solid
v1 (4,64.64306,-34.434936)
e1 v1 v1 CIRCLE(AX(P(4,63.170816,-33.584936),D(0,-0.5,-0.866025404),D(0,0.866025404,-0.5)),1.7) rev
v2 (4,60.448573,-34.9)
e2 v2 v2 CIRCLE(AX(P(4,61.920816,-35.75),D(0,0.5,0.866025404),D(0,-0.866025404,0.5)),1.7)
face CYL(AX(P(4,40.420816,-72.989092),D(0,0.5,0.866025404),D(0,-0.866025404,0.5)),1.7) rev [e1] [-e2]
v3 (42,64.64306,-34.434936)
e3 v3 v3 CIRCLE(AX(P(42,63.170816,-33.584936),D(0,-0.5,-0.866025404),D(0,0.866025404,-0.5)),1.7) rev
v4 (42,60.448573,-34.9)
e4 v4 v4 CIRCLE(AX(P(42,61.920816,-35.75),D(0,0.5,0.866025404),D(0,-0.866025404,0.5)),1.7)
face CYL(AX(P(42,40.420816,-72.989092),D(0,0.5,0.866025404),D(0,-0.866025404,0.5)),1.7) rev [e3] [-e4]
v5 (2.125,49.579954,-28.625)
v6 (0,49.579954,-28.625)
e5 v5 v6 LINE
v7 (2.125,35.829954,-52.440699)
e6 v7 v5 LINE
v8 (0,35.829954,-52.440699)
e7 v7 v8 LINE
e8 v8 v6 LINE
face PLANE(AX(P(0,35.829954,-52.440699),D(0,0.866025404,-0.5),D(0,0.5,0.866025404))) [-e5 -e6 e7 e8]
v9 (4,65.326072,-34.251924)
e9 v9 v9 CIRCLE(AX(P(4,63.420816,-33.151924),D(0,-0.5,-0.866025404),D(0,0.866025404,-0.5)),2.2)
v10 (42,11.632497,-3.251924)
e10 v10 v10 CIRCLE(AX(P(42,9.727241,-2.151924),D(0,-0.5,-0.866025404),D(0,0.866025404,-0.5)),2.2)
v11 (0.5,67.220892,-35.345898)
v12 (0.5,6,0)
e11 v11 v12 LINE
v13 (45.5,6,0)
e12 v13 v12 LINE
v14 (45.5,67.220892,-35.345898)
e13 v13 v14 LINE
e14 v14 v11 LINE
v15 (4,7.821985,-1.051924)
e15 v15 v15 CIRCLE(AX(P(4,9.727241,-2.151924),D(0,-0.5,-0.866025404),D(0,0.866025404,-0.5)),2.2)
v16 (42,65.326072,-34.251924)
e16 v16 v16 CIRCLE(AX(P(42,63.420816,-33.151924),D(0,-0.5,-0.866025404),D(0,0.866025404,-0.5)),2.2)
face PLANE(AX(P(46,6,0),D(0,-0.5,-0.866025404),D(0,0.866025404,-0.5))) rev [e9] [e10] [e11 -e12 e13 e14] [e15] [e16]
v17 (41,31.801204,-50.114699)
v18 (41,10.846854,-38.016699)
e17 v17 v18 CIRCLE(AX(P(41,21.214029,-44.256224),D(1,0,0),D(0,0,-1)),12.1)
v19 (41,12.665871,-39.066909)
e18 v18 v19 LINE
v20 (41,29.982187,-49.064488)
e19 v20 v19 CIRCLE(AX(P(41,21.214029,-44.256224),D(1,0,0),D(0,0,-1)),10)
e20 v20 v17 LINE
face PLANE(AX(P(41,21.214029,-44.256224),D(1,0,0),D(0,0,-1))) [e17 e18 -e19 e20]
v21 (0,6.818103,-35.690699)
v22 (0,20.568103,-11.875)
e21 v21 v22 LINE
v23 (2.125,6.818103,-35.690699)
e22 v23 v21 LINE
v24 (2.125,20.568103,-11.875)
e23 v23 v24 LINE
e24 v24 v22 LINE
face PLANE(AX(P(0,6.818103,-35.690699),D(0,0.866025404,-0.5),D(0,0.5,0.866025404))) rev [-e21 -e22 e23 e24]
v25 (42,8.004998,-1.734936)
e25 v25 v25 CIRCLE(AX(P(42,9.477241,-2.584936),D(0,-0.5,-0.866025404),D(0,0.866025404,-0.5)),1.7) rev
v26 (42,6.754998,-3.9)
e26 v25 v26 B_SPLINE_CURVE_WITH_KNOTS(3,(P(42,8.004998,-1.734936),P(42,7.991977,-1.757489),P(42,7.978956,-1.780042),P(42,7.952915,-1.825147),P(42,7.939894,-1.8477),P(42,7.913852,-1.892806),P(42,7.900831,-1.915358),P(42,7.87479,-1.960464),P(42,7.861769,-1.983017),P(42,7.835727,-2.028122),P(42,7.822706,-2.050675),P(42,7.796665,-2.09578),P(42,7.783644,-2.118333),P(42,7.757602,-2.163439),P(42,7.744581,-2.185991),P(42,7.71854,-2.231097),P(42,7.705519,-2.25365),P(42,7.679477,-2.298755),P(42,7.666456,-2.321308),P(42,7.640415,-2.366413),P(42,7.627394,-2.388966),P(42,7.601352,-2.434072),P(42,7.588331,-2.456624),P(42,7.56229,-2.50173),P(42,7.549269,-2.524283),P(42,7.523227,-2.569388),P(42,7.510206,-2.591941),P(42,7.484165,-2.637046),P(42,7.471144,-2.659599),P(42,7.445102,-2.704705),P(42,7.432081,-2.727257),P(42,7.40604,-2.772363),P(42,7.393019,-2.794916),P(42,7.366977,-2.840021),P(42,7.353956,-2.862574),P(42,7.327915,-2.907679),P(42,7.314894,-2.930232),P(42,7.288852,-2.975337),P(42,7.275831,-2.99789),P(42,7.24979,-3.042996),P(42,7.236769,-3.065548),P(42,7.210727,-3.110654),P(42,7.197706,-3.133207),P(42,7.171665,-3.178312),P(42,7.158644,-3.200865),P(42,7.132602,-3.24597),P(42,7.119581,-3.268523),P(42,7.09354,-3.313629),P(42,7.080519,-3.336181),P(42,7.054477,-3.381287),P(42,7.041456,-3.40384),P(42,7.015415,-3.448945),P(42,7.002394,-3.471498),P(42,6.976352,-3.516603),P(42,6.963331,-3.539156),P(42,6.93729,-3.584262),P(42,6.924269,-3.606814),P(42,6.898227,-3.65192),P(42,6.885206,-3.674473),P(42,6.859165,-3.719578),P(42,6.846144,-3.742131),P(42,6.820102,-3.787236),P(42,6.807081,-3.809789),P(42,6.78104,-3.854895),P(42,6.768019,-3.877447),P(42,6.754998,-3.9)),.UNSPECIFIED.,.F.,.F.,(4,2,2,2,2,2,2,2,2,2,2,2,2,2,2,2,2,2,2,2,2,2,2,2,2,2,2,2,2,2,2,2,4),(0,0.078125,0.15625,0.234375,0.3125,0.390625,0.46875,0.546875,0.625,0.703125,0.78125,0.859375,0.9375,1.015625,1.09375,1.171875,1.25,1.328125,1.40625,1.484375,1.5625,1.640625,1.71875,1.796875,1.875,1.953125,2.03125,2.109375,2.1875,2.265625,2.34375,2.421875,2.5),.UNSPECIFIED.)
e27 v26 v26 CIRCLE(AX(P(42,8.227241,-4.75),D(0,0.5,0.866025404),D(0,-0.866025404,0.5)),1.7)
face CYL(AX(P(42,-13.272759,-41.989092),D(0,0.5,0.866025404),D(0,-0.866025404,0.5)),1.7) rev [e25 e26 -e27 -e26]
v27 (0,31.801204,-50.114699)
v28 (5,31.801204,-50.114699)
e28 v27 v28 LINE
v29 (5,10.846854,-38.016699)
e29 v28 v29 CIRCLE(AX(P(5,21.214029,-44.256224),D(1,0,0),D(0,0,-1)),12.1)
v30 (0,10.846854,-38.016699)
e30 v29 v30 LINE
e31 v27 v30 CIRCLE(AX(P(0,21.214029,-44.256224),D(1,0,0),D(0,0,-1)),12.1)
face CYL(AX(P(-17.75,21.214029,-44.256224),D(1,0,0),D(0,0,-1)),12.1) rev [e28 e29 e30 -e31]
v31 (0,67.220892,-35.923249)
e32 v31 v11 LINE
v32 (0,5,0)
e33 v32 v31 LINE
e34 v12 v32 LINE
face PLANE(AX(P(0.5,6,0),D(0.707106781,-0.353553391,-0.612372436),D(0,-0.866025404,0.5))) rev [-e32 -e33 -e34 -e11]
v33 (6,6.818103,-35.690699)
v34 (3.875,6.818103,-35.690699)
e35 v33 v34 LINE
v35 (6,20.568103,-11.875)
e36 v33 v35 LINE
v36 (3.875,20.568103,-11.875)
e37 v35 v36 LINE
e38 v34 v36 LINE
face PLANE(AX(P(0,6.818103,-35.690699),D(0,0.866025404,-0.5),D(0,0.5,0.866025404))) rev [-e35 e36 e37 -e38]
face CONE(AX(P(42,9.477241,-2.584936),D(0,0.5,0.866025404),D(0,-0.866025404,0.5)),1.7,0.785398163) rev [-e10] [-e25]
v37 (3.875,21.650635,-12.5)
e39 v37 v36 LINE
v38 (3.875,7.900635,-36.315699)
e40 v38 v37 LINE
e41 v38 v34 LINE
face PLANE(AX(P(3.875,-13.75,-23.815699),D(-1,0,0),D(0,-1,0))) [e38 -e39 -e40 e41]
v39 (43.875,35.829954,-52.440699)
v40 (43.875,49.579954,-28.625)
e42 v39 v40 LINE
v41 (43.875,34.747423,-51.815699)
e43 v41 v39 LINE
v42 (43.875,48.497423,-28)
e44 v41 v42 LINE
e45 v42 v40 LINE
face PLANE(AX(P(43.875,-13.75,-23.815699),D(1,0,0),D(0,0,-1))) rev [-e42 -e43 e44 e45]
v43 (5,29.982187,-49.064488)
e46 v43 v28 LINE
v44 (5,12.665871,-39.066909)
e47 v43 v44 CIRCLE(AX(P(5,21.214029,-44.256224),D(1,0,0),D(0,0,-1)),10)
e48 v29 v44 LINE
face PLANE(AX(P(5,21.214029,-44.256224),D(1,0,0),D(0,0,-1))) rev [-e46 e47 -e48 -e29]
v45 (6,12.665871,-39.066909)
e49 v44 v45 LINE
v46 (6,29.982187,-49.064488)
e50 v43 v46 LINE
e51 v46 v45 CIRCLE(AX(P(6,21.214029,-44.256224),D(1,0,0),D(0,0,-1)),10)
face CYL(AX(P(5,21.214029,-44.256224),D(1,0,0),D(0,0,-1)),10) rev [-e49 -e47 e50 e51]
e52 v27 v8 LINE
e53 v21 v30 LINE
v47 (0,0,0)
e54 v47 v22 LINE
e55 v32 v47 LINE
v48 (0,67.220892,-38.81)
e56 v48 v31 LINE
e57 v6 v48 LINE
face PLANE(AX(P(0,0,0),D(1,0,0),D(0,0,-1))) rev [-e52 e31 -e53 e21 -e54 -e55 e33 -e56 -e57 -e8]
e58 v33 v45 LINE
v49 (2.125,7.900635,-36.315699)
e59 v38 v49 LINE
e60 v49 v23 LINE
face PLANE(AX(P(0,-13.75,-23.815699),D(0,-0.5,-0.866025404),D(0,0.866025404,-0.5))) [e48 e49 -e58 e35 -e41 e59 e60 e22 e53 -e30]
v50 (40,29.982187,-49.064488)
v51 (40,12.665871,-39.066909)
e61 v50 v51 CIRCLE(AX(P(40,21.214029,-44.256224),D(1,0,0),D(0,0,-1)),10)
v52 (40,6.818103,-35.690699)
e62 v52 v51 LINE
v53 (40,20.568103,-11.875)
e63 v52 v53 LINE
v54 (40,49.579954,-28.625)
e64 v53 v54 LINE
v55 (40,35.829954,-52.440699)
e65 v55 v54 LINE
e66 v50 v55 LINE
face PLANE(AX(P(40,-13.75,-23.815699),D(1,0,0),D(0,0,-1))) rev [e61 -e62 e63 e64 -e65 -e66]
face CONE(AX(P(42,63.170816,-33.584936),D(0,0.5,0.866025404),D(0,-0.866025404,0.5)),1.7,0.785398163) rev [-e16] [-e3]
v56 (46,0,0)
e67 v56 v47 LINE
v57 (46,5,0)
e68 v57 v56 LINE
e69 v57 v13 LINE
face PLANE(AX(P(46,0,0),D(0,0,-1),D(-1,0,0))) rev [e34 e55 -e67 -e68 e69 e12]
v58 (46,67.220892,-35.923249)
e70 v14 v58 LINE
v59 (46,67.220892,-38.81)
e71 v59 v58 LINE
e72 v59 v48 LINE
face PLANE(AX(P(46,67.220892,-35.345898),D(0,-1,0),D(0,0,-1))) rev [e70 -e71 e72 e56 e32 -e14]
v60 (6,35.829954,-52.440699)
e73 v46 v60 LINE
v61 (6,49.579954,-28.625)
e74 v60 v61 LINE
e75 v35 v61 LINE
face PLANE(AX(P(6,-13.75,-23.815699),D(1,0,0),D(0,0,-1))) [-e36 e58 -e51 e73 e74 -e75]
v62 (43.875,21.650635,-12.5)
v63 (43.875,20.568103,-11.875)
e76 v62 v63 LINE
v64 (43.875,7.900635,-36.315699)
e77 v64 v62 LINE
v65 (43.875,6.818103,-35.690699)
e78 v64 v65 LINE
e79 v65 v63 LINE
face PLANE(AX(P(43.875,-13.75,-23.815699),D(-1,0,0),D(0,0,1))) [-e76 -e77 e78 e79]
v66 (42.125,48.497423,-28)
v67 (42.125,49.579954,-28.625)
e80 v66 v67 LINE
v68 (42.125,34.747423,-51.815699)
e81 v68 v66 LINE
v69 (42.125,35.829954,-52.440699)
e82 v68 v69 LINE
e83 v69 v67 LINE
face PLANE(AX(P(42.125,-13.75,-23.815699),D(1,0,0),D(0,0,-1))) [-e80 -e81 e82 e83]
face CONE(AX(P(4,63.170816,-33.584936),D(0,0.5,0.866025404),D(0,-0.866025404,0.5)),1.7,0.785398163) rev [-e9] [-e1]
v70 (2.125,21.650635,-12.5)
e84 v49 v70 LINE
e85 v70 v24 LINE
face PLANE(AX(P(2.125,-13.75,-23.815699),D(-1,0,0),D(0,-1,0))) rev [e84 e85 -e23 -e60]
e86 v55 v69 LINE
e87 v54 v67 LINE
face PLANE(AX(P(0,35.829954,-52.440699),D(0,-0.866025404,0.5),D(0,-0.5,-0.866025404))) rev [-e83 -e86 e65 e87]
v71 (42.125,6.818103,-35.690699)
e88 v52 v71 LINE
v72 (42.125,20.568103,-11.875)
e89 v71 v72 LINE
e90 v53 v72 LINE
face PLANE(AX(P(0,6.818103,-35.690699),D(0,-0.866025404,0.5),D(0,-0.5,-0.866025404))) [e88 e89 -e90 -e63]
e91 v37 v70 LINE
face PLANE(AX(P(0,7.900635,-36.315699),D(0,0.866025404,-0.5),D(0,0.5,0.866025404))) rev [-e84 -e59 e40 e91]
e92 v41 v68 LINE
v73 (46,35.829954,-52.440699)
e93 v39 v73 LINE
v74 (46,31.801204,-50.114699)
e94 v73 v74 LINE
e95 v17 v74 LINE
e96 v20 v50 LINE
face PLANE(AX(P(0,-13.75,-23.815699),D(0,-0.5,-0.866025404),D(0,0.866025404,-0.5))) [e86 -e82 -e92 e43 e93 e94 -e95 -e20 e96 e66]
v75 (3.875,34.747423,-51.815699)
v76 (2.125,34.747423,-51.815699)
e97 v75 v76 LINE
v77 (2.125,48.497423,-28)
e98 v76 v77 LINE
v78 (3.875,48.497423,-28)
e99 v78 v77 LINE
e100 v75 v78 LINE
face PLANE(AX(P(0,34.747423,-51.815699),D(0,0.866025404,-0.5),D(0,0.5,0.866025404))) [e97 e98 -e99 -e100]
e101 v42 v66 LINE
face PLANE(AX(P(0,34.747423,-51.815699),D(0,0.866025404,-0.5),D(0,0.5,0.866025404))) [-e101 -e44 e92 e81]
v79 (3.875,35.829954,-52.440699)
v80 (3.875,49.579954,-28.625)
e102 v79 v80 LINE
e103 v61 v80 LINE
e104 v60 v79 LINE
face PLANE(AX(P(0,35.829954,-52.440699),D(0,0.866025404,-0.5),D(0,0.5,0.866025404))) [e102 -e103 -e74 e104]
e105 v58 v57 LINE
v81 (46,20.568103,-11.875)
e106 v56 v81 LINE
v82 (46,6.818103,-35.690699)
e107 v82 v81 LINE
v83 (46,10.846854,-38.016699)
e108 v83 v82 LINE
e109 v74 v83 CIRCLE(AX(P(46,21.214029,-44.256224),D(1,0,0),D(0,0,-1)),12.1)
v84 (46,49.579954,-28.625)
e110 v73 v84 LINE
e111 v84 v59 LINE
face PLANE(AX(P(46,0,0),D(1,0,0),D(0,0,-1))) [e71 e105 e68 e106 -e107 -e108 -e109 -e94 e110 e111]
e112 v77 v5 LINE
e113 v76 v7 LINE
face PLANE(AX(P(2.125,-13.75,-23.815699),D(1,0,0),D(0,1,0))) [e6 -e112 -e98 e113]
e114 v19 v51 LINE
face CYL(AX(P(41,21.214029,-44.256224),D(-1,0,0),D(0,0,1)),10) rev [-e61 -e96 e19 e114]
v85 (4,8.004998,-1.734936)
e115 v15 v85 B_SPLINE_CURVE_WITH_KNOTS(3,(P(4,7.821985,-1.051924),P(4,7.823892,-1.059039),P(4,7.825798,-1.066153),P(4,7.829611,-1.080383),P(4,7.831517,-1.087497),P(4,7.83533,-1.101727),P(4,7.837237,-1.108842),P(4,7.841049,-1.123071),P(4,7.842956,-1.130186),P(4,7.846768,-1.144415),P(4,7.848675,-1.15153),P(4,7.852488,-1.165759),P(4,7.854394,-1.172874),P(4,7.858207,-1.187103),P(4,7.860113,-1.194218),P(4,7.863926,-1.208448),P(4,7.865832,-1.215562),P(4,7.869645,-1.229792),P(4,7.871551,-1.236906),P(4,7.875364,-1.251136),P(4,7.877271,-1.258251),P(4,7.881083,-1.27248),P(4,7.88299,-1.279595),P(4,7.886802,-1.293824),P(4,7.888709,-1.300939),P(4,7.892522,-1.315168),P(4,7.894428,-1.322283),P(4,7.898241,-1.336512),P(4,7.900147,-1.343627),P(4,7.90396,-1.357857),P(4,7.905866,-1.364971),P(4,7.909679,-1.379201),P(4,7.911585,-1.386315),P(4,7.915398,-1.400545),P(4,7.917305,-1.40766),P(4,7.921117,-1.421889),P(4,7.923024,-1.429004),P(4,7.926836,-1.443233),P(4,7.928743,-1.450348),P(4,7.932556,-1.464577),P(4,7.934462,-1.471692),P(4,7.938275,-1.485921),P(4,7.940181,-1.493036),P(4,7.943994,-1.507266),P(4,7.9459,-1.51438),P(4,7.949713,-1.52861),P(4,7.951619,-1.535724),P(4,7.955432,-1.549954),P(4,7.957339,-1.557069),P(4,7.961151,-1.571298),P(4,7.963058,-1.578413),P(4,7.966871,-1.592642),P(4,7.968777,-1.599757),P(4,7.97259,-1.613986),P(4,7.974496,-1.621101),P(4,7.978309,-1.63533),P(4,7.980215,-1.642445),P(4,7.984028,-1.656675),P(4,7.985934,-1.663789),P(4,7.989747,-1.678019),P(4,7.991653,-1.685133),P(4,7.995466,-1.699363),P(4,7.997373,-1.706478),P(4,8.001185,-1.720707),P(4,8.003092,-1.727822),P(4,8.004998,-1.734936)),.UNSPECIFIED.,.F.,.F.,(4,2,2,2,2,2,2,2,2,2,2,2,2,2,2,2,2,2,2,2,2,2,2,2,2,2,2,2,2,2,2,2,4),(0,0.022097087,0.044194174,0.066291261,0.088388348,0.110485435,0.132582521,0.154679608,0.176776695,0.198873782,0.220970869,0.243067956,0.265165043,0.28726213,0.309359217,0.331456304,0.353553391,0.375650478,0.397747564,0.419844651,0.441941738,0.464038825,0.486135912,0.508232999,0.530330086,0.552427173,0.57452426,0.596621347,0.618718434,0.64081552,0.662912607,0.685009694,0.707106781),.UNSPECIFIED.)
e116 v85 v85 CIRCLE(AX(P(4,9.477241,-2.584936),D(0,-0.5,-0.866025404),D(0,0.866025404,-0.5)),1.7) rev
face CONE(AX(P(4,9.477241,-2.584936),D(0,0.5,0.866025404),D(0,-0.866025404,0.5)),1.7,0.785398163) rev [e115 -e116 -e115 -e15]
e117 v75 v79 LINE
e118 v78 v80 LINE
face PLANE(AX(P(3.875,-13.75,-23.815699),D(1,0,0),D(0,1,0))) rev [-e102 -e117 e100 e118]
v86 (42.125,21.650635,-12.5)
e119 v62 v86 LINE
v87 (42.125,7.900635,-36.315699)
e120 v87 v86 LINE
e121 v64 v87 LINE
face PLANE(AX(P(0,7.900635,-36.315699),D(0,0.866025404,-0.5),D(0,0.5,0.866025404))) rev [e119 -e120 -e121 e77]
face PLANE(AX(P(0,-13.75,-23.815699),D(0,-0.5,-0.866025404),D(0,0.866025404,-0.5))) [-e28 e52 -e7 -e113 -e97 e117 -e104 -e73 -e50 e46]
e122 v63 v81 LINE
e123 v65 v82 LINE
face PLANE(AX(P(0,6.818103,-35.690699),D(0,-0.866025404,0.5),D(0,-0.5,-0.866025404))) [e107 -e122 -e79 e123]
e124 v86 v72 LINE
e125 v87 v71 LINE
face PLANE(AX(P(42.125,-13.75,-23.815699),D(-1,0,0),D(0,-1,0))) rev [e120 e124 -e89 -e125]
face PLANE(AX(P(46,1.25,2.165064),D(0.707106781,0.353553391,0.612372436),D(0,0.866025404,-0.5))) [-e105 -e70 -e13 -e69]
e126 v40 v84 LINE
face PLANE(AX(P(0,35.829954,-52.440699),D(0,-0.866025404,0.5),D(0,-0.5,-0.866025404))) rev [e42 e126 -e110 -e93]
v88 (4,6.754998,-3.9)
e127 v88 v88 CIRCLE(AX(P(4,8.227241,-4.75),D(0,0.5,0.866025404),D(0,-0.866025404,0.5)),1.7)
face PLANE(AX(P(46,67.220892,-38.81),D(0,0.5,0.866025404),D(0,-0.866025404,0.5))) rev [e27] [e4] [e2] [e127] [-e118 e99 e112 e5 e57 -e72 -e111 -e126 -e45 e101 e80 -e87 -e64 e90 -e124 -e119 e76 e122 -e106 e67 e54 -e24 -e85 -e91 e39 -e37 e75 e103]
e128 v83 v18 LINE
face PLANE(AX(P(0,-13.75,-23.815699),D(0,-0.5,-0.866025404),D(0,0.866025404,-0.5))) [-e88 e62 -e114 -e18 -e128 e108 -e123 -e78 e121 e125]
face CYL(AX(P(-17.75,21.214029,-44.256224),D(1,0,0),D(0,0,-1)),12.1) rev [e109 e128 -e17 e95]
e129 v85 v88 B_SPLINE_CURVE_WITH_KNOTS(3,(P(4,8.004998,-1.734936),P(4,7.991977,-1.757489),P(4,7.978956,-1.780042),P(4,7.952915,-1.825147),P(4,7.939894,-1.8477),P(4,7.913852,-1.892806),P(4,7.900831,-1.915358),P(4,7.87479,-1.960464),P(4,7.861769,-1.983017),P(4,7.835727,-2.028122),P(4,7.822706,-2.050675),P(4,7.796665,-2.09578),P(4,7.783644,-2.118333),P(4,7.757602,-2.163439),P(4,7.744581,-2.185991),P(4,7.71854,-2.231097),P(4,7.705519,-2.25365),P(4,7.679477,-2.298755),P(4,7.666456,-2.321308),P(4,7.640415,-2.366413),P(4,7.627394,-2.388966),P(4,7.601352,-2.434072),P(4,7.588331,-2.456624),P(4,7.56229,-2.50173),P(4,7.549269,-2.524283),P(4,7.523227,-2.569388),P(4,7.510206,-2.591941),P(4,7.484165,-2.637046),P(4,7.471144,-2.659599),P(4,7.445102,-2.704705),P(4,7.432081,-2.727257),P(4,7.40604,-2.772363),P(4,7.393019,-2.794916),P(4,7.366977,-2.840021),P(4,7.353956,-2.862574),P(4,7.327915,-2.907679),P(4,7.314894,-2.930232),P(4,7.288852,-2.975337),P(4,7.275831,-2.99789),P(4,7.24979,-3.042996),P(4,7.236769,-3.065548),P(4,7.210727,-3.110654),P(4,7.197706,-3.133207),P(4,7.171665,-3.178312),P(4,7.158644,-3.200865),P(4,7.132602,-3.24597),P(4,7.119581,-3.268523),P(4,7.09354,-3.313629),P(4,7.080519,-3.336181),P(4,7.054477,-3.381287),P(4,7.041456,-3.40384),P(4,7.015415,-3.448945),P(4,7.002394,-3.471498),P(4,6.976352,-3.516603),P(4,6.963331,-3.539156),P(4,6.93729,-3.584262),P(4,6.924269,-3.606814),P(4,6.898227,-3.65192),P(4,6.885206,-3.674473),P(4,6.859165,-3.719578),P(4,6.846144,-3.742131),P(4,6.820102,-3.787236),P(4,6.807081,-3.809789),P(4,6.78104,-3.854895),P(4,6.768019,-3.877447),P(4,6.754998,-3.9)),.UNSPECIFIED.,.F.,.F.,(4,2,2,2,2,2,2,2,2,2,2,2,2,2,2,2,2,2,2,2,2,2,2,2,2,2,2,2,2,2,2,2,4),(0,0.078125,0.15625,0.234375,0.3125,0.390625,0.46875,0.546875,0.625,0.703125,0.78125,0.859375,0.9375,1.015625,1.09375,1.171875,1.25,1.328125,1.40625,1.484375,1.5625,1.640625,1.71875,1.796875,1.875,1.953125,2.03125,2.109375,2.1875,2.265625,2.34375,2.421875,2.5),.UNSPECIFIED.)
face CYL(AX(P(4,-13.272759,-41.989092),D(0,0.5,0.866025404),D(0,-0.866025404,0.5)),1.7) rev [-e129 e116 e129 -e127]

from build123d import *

# Parameters (mm, degrees)
BOSS_EXTRUDE1_DEPTH = 46
SKETCH2_R           = 1.7
CUT_EXTRUDE1_DEPTH  = 46
BOSS_EXTRUDE3_DEPTH = 27.5
SKETCH8_R           = 12.1
CUT_EXTRUDE2_DEPTH  = 63.75
BOSS_EXTRUDE4_START = -5
BOSS_EXTRUDE4_DEPTH = 1
BOSS_EXTRUDE5_START = -41
BOSS_EXTRUDE5_DEPTH = 1
CHAMFER1_SIZE       = 0.5


# Read off the part's stored shape, not the designer's step: Boss-Extrude5
with BuildPart() as part:
    # Sketch1 → Boss-Extrude1 (new body)
    with BuildSketch(Plane(origin=(0, 0, 0), x_dir=(0, 0, -1), z_dir=(1, 0, 0))):
        Polygon((0, 0), (0, 6), (35.345898385, 67.220891842), (38.81, 67.220891842), align=None)
    extrude(amount=BOSS_EXTRUDE1_DEPTH)

    # Sketch2 → Cut-Extrude1 (cut)
    with BuildSketch(Plane(origin=(0, 1.5, 2.598076211), x_dir=(1, 0, 0), z_dir=(0, 0.4999999999999947, 0.8660254037844417))):
        with Locations(Location((4, 9.5, 0), (0, 0, 270))):
            Circle(SKETCH2_R)
        with Locations(Location((42, 9.5, 0), (0, 0, 270))):
            Circle(SKETCH2_R)
        with Locations(Location((42, 71.5, 0), (0, 0, 270))):
            Circle(SKETCH2_R)
        with Locations(Location((4, 71.5, 0), (0, 0, 270))):
            Circle(SKETCH2_R)
    extrude(amount=-CUT_EXTRUDE1_DEPTH, mode=Mode.SUBTRACT)

    # Sketch7 → Boss-Extrude3 (add)
    with BuildSketch(Plane(origin=(0, 0, 0), x_dir=(-1, 0, 0), z_dir=(0, -0.49999999999999495, -0.8660254037844417))):
        Polygon((-42.125, 23.75), (-40, 23.75), (-40, 57.25), (-42.125, 57.25), (-42.125, 56), (-43.875, 56), (-43.875, 57.25), (-46, 57.25), (-46, 23.75), (-43.875, 23.75), (-43.875, 25), (-42.125, 25), align=None)
        Polygon((-6, 57.25), (-6, 23.75), (-3.875, 23.75), (-3.875, 25), (-2.125, 25), (-2.125, 23.75), (0, 23.75), (0, 57.25), (-2.125, 57.25), (-2.125, 56), (-3.875, 56), (-3.875, 57.25), align=None)
    extrude(amount=BOSS_EXTRUDE3_DEPTH)

    # Sketch8 → Cut-Extrude2 (cut)
    with BuildSketch(Plane(origin=(46, 0, 0), x_dir=(0, 0, -1), z_dir=(1, 0, 0))):
        with Locations((44.256224193, 21.214028853)):
            Circle(SKETCH8_R)
    extrude(amount=-CUT_EXTRUDE2_DEPTH, mode=Mode.SUBTRACT)

    # Sketch9 → Boss-Extrude4 (add)
    with BuildSketch(Plane(origin=(46, 0, 0), x_dir=(0, 0, -1), z_dir=(1, 0, 0)).offset(BOSS_EXTRUDE4_START)):
        with BuildLine():
            ThreePointArc((50.114698521, 31.801204045), (33.777316807, 27.264028853), (38.016698687, 10.846853661))
            Line((38.016698687, 10.846853661), (39.066908751, 12.665870851))
            ThreePointArc((39.066908751, 12.665870851), (35.595970155, 26.214028853), (49.064488458, 29.982186856))
            Line((49.064488458, 29.982186856), (50.114698521, 31.801204045))
        make_face()
    extrude(amount=-BOSS_EXTRUDE4_DEPTH)

    # Boss-Extrude5 outline → Boss-Extrude5 (add)
    with BuildSketch(Plane(origin=(46, 0, 0), x_dir=(0, 0, -1), z_dir=(1, 0, 0)).offset(BOSS_EXTRUDE5_START)):
        with BuildLine():
            ThreePointArc((39.066908751, 12.665870851), (35.595970155, 26.214028854), (49.064488458, 29.982186856))
            Line((49.064488458, 29.982186856), (50.114698521, 31.801204045))
            ThreePointArc((50.114698521, 31.801204045), (33.777316807, 27.264028853), (38.016698687, 10.846853661))
            Line((38.016698687, 10.846853661), (39.066908751, 12.665870851))
        make_face()
    extrude(amount=BOSS_EXTRUDE5_DEPTH)

    # Chamfer1
    chamfer1_edges = [part.edges().sort_by_distance(p)[0] for p in [
        (46, 36.610445921, -17.672949192),
        (4, 64.893059557, -34.001923789),
        (42, 64.893059557, -34.001923789),
        (42, 11.199484522, -3.001923789),
        (4, 11.199484522, -3.001923789),
        (0, 36.610445921, -17.672949192),
    ]]
    chamfer(chamfer1_edges, length=CHAMFER1_SIZE)


solid = part.part
